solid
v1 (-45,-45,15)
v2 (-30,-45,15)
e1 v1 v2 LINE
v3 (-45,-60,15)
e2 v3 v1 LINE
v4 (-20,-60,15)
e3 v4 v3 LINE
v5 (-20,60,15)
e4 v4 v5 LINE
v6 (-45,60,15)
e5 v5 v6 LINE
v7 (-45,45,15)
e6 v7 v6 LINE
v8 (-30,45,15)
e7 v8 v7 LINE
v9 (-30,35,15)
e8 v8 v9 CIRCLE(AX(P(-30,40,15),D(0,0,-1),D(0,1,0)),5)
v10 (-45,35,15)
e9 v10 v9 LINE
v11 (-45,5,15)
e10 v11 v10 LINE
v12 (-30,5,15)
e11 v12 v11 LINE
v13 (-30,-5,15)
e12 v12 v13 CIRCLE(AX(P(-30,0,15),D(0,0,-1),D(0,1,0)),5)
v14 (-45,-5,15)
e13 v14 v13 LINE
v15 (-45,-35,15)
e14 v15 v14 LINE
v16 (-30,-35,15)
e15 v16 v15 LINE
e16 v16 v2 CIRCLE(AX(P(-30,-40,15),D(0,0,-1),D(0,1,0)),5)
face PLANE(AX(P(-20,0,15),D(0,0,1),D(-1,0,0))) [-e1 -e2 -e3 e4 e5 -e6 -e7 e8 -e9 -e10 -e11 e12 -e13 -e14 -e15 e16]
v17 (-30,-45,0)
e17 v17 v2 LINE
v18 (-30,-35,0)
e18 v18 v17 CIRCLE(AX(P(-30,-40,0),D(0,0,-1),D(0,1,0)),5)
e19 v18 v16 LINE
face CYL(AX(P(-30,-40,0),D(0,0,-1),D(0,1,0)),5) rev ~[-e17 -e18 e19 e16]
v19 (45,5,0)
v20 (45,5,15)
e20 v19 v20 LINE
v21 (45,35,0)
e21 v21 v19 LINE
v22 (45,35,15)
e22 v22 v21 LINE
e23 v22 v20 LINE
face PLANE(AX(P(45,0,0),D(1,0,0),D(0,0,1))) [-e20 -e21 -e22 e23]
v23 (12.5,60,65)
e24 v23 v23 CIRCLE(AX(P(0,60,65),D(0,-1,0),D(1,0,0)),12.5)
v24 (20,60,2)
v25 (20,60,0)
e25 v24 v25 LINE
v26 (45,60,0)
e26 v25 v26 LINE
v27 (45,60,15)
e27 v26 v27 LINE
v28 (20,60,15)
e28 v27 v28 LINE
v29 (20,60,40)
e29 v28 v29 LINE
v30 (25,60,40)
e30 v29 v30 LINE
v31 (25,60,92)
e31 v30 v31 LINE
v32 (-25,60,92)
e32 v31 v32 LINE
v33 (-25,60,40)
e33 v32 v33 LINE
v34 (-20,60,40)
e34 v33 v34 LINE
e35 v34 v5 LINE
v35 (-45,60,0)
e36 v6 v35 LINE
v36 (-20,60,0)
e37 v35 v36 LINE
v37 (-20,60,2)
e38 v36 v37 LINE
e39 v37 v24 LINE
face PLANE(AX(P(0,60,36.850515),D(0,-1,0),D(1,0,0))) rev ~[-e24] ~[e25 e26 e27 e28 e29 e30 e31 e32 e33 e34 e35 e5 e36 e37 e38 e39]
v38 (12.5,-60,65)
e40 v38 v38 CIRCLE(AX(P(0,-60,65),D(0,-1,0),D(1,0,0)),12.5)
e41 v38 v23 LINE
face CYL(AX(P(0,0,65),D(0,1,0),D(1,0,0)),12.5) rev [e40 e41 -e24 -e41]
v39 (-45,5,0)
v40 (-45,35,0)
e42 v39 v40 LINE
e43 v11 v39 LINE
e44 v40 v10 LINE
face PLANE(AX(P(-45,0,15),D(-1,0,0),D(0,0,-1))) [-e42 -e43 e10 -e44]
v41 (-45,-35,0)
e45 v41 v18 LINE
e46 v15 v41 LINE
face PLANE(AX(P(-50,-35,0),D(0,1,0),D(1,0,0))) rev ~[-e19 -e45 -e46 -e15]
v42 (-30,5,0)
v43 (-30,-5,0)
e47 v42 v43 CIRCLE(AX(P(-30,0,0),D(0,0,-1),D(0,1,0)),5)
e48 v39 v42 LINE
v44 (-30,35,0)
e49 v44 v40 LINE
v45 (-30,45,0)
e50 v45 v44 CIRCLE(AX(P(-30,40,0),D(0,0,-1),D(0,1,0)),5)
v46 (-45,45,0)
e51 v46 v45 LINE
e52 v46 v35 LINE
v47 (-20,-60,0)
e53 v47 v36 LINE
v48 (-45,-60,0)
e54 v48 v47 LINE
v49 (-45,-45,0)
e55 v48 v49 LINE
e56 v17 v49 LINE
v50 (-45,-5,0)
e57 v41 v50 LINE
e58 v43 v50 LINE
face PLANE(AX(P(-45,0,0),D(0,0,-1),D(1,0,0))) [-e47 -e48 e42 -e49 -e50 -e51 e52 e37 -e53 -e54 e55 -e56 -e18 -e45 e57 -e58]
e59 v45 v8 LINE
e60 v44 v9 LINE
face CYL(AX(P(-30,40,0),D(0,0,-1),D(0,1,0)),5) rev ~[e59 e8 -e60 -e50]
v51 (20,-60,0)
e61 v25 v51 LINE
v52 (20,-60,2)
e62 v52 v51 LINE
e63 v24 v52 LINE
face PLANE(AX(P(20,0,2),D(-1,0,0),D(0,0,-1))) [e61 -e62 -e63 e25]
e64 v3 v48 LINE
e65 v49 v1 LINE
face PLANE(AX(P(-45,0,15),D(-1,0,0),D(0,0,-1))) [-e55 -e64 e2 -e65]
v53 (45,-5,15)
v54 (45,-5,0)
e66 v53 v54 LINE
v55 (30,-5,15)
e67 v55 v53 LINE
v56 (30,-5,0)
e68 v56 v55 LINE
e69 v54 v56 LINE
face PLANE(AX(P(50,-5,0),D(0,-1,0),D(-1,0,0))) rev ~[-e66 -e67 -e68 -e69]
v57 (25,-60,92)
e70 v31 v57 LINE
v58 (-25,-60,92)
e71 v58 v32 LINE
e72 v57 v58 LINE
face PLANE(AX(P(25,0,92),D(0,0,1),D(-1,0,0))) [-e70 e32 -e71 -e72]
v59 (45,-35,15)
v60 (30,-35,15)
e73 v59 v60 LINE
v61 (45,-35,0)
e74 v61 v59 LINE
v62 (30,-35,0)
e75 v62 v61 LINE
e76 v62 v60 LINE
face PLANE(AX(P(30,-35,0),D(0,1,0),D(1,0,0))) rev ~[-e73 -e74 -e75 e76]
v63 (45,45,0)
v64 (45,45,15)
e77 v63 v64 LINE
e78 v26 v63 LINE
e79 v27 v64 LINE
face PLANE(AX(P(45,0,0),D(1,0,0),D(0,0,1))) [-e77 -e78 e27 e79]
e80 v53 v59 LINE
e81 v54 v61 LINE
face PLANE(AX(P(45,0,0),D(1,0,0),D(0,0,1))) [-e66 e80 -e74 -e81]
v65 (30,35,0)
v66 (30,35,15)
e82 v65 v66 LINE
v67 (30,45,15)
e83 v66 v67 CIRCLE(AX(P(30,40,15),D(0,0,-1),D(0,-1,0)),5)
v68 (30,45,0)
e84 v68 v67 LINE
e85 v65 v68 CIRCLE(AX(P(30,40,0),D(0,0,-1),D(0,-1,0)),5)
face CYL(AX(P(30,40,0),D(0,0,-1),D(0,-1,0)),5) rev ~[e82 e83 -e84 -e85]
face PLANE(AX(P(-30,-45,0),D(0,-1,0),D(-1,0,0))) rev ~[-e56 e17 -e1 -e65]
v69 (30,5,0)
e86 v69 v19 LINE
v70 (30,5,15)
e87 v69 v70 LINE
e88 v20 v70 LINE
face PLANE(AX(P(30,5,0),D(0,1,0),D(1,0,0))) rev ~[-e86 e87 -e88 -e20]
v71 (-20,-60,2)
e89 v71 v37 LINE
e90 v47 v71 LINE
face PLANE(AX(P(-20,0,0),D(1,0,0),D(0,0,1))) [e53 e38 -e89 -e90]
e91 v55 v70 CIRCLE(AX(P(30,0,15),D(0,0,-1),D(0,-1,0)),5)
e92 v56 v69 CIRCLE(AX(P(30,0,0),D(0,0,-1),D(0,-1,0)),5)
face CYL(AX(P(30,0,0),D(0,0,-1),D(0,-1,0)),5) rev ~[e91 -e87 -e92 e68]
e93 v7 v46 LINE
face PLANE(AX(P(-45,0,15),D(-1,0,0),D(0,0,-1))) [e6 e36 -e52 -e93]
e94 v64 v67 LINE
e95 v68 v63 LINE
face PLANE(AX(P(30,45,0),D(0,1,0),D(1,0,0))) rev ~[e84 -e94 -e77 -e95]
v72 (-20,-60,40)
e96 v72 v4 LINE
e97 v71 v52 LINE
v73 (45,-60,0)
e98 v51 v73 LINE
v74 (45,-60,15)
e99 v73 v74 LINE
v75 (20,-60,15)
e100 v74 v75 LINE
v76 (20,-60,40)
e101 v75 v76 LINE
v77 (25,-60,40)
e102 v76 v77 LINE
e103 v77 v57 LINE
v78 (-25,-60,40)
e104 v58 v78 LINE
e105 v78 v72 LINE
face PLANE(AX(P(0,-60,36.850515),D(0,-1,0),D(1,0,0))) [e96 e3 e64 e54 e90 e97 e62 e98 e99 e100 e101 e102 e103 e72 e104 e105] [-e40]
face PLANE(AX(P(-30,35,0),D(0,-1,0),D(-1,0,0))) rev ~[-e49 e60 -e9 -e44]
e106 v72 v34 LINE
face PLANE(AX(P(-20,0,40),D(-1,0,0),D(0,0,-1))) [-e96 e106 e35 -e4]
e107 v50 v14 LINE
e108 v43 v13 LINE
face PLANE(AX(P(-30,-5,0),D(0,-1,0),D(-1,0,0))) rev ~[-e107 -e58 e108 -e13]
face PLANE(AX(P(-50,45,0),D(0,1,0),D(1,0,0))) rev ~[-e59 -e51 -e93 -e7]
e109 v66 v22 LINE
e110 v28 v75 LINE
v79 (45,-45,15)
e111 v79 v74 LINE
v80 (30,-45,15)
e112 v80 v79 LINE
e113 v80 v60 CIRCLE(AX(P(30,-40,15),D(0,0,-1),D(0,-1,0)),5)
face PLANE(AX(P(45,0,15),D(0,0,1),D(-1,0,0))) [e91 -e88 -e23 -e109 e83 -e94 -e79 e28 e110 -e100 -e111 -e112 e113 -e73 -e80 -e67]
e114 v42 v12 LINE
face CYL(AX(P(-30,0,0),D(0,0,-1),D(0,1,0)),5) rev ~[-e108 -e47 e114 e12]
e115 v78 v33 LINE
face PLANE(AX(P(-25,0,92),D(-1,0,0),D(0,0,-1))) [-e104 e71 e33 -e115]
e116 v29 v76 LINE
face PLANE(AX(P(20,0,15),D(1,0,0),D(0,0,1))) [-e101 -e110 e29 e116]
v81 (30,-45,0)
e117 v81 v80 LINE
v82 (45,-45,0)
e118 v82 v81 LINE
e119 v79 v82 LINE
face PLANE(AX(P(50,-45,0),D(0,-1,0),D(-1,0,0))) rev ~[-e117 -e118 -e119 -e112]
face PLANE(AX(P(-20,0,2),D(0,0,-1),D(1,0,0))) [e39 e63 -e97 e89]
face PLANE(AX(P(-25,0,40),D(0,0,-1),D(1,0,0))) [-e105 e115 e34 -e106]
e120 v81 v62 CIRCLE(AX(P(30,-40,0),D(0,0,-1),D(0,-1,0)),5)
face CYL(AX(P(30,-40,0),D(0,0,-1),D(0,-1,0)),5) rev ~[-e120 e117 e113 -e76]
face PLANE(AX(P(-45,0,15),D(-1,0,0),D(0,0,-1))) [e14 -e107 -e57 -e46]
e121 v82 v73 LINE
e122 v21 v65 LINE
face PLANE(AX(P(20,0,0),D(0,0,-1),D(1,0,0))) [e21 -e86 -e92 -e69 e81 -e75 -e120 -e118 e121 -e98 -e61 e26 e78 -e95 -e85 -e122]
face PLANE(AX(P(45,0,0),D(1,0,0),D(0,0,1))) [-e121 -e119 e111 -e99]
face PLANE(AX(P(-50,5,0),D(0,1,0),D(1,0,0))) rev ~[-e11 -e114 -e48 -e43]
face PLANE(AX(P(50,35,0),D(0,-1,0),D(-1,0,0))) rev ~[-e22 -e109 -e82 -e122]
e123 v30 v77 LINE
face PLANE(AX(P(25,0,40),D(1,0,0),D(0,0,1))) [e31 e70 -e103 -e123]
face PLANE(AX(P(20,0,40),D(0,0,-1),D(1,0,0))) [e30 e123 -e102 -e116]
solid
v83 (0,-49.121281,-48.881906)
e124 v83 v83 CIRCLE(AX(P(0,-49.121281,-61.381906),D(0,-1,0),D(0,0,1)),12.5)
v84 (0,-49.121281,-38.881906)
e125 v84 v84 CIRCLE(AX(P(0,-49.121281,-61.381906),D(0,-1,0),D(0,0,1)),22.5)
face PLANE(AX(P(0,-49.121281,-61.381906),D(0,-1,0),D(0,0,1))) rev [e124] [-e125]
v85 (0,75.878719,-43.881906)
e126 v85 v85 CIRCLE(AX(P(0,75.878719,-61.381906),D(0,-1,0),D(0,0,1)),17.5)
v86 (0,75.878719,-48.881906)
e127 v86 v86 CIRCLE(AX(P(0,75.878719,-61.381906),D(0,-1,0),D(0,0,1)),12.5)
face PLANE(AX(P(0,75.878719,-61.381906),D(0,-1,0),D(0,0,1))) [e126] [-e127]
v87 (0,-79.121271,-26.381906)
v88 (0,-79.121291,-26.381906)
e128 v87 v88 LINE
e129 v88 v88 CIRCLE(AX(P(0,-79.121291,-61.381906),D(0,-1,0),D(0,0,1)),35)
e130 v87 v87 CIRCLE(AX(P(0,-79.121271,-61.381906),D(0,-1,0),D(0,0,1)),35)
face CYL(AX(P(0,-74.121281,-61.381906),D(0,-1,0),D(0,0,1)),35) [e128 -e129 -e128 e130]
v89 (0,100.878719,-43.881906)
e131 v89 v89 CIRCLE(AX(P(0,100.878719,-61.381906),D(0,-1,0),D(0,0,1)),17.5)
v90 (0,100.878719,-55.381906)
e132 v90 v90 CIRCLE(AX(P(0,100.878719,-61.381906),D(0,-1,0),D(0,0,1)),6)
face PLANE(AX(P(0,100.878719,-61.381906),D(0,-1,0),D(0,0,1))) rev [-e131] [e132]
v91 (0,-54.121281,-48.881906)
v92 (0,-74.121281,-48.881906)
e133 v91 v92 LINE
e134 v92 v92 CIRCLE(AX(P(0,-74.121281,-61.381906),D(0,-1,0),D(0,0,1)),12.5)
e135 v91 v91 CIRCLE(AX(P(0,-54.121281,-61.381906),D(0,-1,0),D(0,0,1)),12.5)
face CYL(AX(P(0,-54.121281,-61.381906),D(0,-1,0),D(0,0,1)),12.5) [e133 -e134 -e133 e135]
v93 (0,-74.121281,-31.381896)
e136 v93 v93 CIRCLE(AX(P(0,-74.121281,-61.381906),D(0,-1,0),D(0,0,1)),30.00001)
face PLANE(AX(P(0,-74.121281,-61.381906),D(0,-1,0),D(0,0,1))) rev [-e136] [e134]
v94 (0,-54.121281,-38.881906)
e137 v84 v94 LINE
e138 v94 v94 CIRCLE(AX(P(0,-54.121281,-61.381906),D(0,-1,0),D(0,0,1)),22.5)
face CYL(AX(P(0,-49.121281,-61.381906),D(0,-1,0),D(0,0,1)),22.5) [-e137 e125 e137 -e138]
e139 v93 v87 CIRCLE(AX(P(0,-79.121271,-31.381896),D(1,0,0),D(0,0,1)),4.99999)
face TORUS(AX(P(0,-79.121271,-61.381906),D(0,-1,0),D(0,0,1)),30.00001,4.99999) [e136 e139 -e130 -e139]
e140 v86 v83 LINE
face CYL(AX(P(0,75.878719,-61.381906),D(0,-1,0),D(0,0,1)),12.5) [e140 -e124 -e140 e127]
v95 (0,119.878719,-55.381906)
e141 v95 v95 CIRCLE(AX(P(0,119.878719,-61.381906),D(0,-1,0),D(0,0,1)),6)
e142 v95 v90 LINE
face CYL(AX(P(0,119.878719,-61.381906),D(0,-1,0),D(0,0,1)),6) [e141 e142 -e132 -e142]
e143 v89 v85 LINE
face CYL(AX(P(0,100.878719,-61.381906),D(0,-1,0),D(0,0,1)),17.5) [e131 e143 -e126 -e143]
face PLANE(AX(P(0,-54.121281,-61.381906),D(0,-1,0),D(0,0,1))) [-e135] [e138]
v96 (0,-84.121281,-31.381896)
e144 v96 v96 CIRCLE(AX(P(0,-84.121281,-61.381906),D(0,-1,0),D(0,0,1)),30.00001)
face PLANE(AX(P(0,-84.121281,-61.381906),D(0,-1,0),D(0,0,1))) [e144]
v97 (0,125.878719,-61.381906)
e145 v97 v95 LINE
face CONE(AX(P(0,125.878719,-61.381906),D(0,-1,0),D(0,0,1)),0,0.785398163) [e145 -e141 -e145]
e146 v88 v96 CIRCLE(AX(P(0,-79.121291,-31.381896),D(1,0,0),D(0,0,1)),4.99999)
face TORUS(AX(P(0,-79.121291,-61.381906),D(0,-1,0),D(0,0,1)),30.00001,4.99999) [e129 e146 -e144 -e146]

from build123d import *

# Parameters (mm, degrees)
F0_R     = 12.5
F1_DEPTH = 60
F3_DEPTH = 25
F6_R     = 4.99999


# Not quite as in the source:
# - a fillet or chamfer is up to 0.001 mm smaller than in the source, because OpenCascade refuses the exact size


with BuildPart() as f1:
    # F0 (on Front) → F1 (new body, symmetric)
    with BuildSketch(Plane.XZ):
        Polygon((-20, 2), (0, 2), (20, 2), (20, 0), (45, 0), (45, 15), (20, 15), (20, 40), (25, 40), (25, 92), (-25, 92), (-25, 40), (-20, 40), (-20, 15), (-45, 15), (-45, 0), (-20, 0), align=None)
        with Locations((0, 65)):
            Circle(F0_R, mode=Mode.SUBTRACT)
    extrude(amount=F1_DEPTH, both=True)

    # F2 (on face) → F3 (cut)
    with BuildSketch(Plane(origin=(0, 0, 0), x_dir=(1, 0, 0), z_dir=(0, 0, -1))):
        with BuildLine():
            ThreePointArc((-30, 35), (-25, 40), (-30, 45))
            Line((-30, 45), (-50, 45))
            ThreePointArc((-50, 45), (-55, 40), (-50, 35))
            Line((-50, 35), (-30, 35))
        make_face()
        with BuildLine():
            ThreePointArc((-30, -5), (-25, 0), (-30, 5))
            Line((-30, 5), (-50, 5))
            ThreePointArc((-50, 5), (-55, 0), (-50, -5))
            Line((-50, -5), (-30, -5))
        make_face()
        with BuildLine():
            ThreePointArc((-30, -45), (-25, -40), (-30, -35))
            Line((-30, -35), (-50, -35))
            ThreePointArc((-50, -35), (-55, -40), (-50, -45))
            Line((-50, -45), (-30, -45))
        make_face()
        with BuildLine():
            Line((50, 45), (30, 45))
            ThreePointArc((30, 45), (25, 40), (30, 35))
            Line((30, 35), (50, 35))
            ThreePointArc((50, 35), (55, 40), (50, 45))
        make_face()
        with BuildLine():
            Line((50, 5), (30, 5))
            ThreePointArc((30, 5), (25, 0), (30, -5))
            Line((30, -5), (50, -5))
            ThreePointArc((50, -5), (55, 0), (50, 5))
        make_face()
        with BuildLine():
            Line((50, -35), (30, -35))
            ThreePointArc((30, -35), (25, -40), (30, -45))
            Line((30, -45), (50, -45))
            ThreePointArc((50, -45), (55, -40), (50, -35))
        make_face()
    extrude(amount=-F3_DEPTH, mode=Mode.SUBTRACT)


with BuildPart() as f5:
    # F4 (on Right) → F5 (revolve)
    with BuildSketch(Plane.YZ):
        Polygon((-84.121281445, -61.381906271), (125.878718555, -61.381906271), (119.878718555, -55.381906271), (100.878718555, -55.381906271), (100.878718555, -43.881906271), (75.878718555, -43.881906271), (75.878718555, -48.881906271), (-49.121281445, -48.881906271), (-49.121281445, -38.881906271), (-54.121281445, -38.881906271), (-54.121281445, -48.881906271), (-74.121281445, -48.881906271), (-74.121281445, -26.381906271), (-84.121281445, -26.381906271), align=None)
    revolve(axis=Axis((0, 20.878718555, -61.381906271), (0, -1, 0)))

    # F6 (radius 5 in the source; OpenCascade refuses exactly that, so slightly less here)
    f6_edges = [f5.edges().sort_by_distance(p)[0] for p in [
        (0, -74.121281, -96.381906),
        (0, -84.121281, -96.381906),
    ]]
    fillet(f6_edges, radius=F6_R)


solid = Compound([f1.part, f5.part])
